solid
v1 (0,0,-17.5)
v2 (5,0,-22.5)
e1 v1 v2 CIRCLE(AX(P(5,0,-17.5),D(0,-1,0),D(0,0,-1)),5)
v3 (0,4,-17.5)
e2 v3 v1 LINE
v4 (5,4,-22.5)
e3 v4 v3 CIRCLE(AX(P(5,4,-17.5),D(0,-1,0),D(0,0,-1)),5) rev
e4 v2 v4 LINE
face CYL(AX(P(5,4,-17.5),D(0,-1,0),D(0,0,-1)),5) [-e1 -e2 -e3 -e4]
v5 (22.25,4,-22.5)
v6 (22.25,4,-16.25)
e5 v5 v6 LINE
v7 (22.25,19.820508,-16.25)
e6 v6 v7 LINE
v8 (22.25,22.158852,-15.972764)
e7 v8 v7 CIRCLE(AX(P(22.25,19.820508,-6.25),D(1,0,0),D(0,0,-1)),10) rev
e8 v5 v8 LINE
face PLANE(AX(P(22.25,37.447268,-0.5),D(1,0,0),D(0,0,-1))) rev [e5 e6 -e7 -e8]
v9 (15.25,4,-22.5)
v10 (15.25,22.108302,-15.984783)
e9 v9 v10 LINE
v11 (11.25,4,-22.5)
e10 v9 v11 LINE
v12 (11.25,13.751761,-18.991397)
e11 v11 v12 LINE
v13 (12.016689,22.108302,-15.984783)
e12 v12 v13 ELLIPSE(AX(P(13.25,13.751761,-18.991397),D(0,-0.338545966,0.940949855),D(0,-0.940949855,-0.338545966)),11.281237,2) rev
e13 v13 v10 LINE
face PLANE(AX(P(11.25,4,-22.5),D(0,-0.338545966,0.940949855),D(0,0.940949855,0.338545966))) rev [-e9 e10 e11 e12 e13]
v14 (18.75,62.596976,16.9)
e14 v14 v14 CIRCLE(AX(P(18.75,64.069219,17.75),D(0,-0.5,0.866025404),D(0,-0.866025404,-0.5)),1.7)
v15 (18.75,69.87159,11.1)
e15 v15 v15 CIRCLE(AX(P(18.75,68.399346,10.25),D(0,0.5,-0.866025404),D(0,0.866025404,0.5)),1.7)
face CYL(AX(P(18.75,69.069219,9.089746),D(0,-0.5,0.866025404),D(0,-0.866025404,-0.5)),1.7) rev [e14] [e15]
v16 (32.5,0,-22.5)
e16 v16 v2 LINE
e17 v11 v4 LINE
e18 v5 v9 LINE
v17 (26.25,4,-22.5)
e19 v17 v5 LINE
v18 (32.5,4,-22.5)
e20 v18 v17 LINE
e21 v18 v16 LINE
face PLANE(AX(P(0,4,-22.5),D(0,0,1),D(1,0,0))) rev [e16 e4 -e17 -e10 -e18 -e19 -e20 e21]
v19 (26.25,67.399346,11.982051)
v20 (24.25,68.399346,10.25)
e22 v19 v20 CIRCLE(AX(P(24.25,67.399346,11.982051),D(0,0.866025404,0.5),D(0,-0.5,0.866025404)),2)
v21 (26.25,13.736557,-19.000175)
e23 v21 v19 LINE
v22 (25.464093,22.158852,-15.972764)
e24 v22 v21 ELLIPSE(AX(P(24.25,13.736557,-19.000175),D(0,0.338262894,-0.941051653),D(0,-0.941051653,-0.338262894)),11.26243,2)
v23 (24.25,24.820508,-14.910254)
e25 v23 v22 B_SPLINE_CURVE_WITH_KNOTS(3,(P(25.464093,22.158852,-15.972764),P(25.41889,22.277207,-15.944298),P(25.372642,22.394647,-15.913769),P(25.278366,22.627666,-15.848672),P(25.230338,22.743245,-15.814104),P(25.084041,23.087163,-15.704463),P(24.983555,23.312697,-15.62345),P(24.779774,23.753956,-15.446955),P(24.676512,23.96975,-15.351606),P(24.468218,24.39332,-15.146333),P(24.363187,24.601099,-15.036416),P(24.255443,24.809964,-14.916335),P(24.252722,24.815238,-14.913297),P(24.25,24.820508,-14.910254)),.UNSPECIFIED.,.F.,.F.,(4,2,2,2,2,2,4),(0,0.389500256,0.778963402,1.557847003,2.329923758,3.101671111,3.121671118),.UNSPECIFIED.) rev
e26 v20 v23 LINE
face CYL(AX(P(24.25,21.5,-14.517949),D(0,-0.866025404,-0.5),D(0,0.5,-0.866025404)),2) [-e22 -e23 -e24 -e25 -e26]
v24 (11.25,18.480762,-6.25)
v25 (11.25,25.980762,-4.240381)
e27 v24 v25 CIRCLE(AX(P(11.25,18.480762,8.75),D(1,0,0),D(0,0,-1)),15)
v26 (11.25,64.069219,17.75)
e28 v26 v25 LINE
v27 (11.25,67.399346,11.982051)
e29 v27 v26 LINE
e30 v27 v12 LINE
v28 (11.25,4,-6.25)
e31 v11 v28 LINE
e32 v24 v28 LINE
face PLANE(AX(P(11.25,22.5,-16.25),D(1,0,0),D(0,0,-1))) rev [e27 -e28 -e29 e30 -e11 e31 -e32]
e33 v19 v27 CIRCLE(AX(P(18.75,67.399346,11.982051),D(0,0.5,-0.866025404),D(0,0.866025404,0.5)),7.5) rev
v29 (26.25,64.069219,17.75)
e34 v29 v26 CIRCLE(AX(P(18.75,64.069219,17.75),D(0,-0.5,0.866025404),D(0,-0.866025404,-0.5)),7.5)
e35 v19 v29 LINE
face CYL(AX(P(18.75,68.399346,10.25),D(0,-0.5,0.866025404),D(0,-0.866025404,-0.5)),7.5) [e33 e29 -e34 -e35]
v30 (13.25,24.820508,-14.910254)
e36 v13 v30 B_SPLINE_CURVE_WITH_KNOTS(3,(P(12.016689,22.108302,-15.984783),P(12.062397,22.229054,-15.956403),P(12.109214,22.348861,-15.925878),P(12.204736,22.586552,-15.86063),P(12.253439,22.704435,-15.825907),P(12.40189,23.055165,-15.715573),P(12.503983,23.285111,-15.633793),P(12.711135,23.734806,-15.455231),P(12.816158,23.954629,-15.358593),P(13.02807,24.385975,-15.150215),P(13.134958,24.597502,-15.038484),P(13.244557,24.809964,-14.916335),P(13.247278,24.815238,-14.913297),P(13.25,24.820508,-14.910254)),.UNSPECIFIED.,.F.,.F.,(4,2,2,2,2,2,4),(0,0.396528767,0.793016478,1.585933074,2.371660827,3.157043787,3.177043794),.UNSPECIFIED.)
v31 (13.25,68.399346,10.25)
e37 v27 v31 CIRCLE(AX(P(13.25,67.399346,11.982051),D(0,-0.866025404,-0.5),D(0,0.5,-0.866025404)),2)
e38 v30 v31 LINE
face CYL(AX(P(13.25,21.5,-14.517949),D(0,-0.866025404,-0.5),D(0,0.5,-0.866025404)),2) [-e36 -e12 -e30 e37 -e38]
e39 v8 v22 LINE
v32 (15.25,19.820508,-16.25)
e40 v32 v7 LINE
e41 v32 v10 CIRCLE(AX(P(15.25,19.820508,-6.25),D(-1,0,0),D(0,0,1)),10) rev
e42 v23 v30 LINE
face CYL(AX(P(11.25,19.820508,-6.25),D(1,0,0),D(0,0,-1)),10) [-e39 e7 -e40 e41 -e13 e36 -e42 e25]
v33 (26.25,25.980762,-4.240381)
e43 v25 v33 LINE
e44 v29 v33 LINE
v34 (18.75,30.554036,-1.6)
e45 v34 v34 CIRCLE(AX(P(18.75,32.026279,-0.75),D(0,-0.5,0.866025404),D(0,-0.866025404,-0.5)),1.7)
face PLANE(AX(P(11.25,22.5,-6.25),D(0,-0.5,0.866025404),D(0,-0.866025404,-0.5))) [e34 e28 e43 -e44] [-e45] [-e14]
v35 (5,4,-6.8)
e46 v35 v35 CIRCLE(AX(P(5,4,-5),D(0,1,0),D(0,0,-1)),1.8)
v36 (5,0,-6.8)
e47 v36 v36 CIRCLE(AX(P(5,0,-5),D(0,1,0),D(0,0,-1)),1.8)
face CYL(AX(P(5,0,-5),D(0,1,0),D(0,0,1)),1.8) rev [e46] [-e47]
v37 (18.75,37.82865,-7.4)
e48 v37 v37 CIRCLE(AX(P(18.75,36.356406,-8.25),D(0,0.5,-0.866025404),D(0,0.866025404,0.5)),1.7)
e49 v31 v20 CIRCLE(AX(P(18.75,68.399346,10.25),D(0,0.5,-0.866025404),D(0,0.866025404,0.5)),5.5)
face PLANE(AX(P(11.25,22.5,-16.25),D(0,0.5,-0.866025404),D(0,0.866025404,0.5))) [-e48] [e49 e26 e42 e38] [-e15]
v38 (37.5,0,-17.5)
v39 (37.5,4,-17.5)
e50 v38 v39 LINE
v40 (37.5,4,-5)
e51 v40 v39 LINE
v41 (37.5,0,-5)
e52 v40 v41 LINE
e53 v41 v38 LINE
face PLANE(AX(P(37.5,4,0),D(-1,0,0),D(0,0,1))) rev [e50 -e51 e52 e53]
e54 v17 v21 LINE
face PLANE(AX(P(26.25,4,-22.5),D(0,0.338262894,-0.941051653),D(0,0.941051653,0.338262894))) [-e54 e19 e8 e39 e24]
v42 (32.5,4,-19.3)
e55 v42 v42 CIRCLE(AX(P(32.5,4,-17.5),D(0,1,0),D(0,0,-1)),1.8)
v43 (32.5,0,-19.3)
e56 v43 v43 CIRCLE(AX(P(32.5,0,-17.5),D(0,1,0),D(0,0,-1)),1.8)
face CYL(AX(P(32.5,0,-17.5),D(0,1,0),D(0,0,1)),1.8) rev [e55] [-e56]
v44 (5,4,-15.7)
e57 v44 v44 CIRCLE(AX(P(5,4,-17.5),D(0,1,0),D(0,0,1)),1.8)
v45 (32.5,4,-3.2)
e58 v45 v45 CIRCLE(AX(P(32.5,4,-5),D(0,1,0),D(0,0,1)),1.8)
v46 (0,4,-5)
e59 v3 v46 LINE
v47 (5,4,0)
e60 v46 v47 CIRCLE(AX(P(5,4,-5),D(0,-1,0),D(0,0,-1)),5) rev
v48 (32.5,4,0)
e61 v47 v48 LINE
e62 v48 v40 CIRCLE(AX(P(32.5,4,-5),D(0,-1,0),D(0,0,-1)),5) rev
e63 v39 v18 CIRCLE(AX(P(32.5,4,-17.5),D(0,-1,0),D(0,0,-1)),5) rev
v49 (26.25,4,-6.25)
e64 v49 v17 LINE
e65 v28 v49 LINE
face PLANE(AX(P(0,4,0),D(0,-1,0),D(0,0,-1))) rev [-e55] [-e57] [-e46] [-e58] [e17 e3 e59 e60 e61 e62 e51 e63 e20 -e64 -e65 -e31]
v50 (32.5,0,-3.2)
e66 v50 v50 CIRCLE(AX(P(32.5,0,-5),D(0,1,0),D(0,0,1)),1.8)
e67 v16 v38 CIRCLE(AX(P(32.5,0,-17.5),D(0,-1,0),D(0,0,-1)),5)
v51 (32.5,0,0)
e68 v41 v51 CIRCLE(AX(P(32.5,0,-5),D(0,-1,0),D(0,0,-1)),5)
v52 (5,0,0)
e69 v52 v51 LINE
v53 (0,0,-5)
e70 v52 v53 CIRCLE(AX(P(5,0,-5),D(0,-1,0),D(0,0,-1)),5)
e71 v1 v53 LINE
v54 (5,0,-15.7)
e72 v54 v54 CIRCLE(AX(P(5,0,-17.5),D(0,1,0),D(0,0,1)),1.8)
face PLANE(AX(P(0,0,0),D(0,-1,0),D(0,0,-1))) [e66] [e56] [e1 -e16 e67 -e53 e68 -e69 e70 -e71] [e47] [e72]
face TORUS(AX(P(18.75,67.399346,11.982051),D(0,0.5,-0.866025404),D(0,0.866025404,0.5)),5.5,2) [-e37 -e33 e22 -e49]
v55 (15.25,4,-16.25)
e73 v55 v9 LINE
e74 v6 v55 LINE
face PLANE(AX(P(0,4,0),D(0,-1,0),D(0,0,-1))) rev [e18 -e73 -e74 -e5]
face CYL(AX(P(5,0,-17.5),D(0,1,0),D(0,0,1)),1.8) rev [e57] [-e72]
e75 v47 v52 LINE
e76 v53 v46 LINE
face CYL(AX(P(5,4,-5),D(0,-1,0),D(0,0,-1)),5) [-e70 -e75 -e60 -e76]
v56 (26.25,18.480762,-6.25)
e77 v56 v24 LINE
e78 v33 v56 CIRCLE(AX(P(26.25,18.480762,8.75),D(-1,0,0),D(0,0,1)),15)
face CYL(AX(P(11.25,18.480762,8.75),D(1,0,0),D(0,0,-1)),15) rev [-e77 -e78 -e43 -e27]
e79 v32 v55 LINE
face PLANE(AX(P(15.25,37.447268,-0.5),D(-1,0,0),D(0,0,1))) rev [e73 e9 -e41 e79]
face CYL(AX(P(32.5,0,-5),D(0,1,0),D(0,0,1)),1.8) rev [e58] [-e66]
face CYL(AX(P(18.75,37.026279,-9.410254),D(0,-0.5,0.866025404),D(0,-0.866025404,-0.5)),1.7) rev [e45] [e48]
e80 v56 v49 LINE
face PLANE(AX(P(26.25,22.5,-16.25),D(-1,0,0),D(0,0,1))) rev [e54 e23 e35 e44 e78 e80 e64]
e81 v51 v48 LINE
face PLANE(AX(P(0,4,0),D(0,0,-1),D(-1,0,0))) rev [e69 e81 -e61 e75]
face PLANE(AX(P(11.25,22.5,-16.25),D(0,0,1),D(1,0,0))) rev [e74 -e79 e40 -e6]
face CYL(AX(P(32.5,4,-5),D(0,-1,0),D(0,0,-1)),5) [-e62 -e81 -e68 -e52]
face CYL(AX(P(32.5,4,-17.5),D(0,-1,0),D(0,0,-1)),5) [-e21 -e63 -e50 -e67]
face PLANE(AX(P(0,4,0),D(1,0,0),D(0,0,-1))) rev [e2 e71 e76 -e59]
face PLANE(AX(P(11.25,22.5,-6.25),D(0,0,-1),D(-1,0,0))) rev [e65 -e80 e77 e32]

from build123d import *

# Parameters (mm, degrees)
SKETCH_1_W          = 37.5
SKETCH_1_H          = 22.5
EXTRUDE_2_DEPTH     = 4
SKETCH_2_W          = 15
SKETCH_2_H          = 10
EXTRUDE_3_DEPTH     = 18.5
EXTRUDE_4_DEPTH     = 15
EXTRUDE_5_DEPTH     = 8.66025404
SKETCH_5_R          = 1.7
CUT_EXTRUDE_1_DEPTH = 10
FILLET_1_R          = 15
FILLET_3_R          = 5
SKETCH_9_R          = 1.8
CUT_EXTRUDE_2_DEPTH = 4
FILLET_5_R          = 10
RIB_10_REACH        = 84.489
SKETCH_16_WALL_W    = 186.275176358
SKETCH_16_WALL_H    = 4
RIB_START           = -4
RIB_11_DEPTH        = 4
FILLET_6_R          = 2


# Read off the part's stored shape, not the designer's step: 筋11
with BuildPart() as part:
    # 草图1 → 凸台-拉伸2 (new body)
    with BuildSketch(Plane(origin=(0, 0, 0), x_dir=(1, 0, 0), z_dir=(0, 1, 0))):
        with Locations((18.75, 11.25)):
            Rectangle(SKETCH_1_W, SKETCH_1_H)
    extrude(amount=EXTRUDE_2_DEPTH)

    # 草图2 → 凸台-拉伸3 (add)
    with BuildSketch(Plane(origin=(0, 4, 0), x_dir=(1, 0, 0), z_dir=(0, 1, 0))):
        with Locations((18.75, 11.25)):
            Rectangle(SKETCH_2_W, SKETCH_2_H)
    extrude(amount=EXTRUDE_3_DEPTH)

    # 草图3 → 凸台-拉伸4 (add)
    with BuildSketch(Plane(origin=(26.25, 0, 0), x_dir=(0, 0, -1), z_dir=(1, 0, 0))):
        Polygon((6.25, 22.5), (-17.75, 64.069219382), (-10.25, 68.399346401), (16.25, 22.5), align=None)
    extrude(amount=-EXTRUDE_4_DEPTH)

    # 草图4 → 凸台-拉伸5 (add)
    with BuildSketch(Plane(origin=(0, 8.331329387, -14.430285793), x_dir=(1, 0, 0), z_dir=(0, -0.5000000000000041, 0.8660254037844363))):
        with BuildLine():
            Line((26.25, 64.360571585), (11.25, 64.360571585))
            ThreePointArc((11.25, 64.360571585), (18.75, 71.860571585), (26.25, 64.360571585))
        make_face()
    extrude(amount=-EXTRUDE_5_DEPTH)

    # 草图5 → 切除-拉伸1 (cut)
    with BuildSketch(Plane(origin=(0, 8.331329387, -14.430285793), x_dir=(1, 0, 0), z_dir=(0, -0.5000000000000041, 0.8660254037844363))):
        with Locations(Location((18.75, 64.360571585, 0), (0, 0, 270))):
            Circle(SKETCH_5_R)
        with Locations(Location((18.75, 27.360571585, 0), (0, 0, 270))):
            Circle(SKETCH_5_R)
    extrude(amount=-CUT_EXTRUDE_1_DEPTH, mode=Mode.SUBTRACT)

    # 圆角1
    fillet_1_edges = [part.edges().sort_by_distance(p)[0] for p in [
        (18.75, 22.5, -6.25),
    ]]
    fillet(fillet_1_edges, radius=FILLET_1_R)

    # 圆角3
    fillet_3_edges = [part.edges().sort_by_distance(p)[0] for p in [
        (0, 2, -22.5),
        (37.5, 2, -22.5),
        (37.5, 2, 0),
        (0, 2, 0),
    ]]
    fillet(fillet_3_edges, radius=FILLET_3_R)

    # 草图9 → 切除-拉伸2 (cut)
    with BuildSketch(Plane(origin=(0, 4, 0), x_dir=(1, 0, 0), z_dir=(0, 1, 0))):
        with Locations(Location((5, 17.5, 0), (0, 0, 270))):
            Circle(SKETCH_9_R)
        with Locations(Location((32.5, 17.5, 0), (0, 0, 90))):
            Circle(SKETCH_9_R)
        with Locations(Location((32.5, 5, 0), (0, 0, 270))):
            Circle(SKETCH_9_R)
        with Locations(Location((5, 5, 0), (0, 0, 90))):
            Circle(SKETCH_9_R)
    extrude(amount=-CUT_EXTRUDE_2_DEPTH, mode=Mode.SUBTRACT)

    # 圆角5
    fillet_5_edges = [part.edges().sort_by_distance(p)[0] for p in [
        (18.75, 22.5, -16.25),
    ]]
    fillet(fillet_5_edges, radius=FILLET_5_R)

    # 草图16 wall → 筋10 (add, up to next)
    with BuildSketch(Plane(origin=(26.25, 13.079426042, -19.236382193), x_dir=(0, 0.941051653324, 0.33826289447), z_dir=(0, -0.33826289447, 0.941051653324)), mode=Mode.PRIVATE) as rib_10_sk1:
        with Locations((0, 2)):
            Rectangle(SKETCH_16_WALL_W, SKETCH_16_WALL_H)
    rib_10_tool1 = extrude(rib_10_sk1.sketch, amount=RIB_10_REACH, mode=Mode.PRIVATE) - part.part
    add(rib_10_tool1.solids().sort_by_distance((26.25, 13.079426042, -19.236382193))[0])

    # 筋11 outline → 筋11 (add)
    with BuildSketch(Plane.ZY.offset(-11.25).offset(RIB_START)):
        with BuildLine():
            Line((-15.98478303, 22.108301633), (-22.5, 4))
            Line((-22.5, 4), (-16.25, 4))
            Line((-16.25, 4), (-16.25, 19.820508076))
            ThreePointArc((-16.25, 19.820508076), (-16.183474475, 20.972065652), (-15.98478303, 22.108301633))
        make_face()
    extrude(amount=RIB_11_DEPTH)

    # 圆角6
    # the kernel refuses this fillet: 2 mm, written as the material it takes off along each edge
    with BuildSketch(Plane(origin=(11.25, 68.399346401, 10.25), x_dir=(1.7763568394002473e-15, -0.5000000000000042, 0.8660254037844363), z_dir=(0, -0.8660254037844363, -0.5000000000000042)), Plane(origin=(26.25, 68.399346401, 10.25), x_dir=(-1, 0, 0), z_dir=(0, -0.8660254037844363, -0.5000000000000042))) as fillet_6_piece_1:
        with BuildLine():
            CenterArc((FILLET_6_R, -FILLET_6_R), FILLET_6_R, 90, 90)
            Line((0, -FILLET_6_R), (-FILLET_6_R * 0.02, -FILLET_6_R))
            Line((-FILLET_6_R * 0.02, -FILLET_6_R), (-FILLET_6_R * 0.02, FILLET_6_R * 0.02))
            Line((-FILLET_6_R * 0.02, FILLET_6_R * 0.02), (FILLET_6_R, FILLET_6_R * 0.02))
            Line((FILLET_6_R, FILLET_6_R * 0.02), (FILLET_6_R, 0))
        make_face()
    extrude(amount=62.320508076, mode=Mode.SUBTRACT)
    with BuildSketch(Plane(origin=(18.75, 68.399346402, 10.249999998), x_dir=(-1, 0, 0), z_dir=(0, -0.8660254037844363, -0.5000000000000041))) as fillet_6_piece_2:
        with BuildLine():
            CenterArc((7.5 - FILLET_6_R, -FILLET_6_R * 1.00000000108), FILLET_6_R, 360, 90)
            Line((7.5, -FILLET_6_R * 1.00000000108), (7.5 + FILLET_6_R * 0.02, -FILLET_6_R * 1.00000000108))
            Line((7.5 + FILLET_6_R * 0.02, -FILLET_6_R * 1.00000000108), (7.5 + FILLET_6_R * 0.02, FILLET_6_R * 0.02))
            Line((7.5 + FILLET_6_R * 0.02, FILLET_6_R * 0.02), (7.5 - FILLET_6_R, FILLET_6_R * 0.0199999989222))
            Line((7.5 - FILLET_6_R, FILLET_6_R * 0.0199999989222), (7.5 - FILLET_6_R, -FILLET_6_R * 1.07782831552e-09))
        make_face()
    revolve(axis=Axis((18.75, 68.399346402, 10.249999998), (0, 0.5000000000000041, -0.8660254037844363)), revolution_arc=180, mode=Mode.SUBTRACT)


solid = part.part
